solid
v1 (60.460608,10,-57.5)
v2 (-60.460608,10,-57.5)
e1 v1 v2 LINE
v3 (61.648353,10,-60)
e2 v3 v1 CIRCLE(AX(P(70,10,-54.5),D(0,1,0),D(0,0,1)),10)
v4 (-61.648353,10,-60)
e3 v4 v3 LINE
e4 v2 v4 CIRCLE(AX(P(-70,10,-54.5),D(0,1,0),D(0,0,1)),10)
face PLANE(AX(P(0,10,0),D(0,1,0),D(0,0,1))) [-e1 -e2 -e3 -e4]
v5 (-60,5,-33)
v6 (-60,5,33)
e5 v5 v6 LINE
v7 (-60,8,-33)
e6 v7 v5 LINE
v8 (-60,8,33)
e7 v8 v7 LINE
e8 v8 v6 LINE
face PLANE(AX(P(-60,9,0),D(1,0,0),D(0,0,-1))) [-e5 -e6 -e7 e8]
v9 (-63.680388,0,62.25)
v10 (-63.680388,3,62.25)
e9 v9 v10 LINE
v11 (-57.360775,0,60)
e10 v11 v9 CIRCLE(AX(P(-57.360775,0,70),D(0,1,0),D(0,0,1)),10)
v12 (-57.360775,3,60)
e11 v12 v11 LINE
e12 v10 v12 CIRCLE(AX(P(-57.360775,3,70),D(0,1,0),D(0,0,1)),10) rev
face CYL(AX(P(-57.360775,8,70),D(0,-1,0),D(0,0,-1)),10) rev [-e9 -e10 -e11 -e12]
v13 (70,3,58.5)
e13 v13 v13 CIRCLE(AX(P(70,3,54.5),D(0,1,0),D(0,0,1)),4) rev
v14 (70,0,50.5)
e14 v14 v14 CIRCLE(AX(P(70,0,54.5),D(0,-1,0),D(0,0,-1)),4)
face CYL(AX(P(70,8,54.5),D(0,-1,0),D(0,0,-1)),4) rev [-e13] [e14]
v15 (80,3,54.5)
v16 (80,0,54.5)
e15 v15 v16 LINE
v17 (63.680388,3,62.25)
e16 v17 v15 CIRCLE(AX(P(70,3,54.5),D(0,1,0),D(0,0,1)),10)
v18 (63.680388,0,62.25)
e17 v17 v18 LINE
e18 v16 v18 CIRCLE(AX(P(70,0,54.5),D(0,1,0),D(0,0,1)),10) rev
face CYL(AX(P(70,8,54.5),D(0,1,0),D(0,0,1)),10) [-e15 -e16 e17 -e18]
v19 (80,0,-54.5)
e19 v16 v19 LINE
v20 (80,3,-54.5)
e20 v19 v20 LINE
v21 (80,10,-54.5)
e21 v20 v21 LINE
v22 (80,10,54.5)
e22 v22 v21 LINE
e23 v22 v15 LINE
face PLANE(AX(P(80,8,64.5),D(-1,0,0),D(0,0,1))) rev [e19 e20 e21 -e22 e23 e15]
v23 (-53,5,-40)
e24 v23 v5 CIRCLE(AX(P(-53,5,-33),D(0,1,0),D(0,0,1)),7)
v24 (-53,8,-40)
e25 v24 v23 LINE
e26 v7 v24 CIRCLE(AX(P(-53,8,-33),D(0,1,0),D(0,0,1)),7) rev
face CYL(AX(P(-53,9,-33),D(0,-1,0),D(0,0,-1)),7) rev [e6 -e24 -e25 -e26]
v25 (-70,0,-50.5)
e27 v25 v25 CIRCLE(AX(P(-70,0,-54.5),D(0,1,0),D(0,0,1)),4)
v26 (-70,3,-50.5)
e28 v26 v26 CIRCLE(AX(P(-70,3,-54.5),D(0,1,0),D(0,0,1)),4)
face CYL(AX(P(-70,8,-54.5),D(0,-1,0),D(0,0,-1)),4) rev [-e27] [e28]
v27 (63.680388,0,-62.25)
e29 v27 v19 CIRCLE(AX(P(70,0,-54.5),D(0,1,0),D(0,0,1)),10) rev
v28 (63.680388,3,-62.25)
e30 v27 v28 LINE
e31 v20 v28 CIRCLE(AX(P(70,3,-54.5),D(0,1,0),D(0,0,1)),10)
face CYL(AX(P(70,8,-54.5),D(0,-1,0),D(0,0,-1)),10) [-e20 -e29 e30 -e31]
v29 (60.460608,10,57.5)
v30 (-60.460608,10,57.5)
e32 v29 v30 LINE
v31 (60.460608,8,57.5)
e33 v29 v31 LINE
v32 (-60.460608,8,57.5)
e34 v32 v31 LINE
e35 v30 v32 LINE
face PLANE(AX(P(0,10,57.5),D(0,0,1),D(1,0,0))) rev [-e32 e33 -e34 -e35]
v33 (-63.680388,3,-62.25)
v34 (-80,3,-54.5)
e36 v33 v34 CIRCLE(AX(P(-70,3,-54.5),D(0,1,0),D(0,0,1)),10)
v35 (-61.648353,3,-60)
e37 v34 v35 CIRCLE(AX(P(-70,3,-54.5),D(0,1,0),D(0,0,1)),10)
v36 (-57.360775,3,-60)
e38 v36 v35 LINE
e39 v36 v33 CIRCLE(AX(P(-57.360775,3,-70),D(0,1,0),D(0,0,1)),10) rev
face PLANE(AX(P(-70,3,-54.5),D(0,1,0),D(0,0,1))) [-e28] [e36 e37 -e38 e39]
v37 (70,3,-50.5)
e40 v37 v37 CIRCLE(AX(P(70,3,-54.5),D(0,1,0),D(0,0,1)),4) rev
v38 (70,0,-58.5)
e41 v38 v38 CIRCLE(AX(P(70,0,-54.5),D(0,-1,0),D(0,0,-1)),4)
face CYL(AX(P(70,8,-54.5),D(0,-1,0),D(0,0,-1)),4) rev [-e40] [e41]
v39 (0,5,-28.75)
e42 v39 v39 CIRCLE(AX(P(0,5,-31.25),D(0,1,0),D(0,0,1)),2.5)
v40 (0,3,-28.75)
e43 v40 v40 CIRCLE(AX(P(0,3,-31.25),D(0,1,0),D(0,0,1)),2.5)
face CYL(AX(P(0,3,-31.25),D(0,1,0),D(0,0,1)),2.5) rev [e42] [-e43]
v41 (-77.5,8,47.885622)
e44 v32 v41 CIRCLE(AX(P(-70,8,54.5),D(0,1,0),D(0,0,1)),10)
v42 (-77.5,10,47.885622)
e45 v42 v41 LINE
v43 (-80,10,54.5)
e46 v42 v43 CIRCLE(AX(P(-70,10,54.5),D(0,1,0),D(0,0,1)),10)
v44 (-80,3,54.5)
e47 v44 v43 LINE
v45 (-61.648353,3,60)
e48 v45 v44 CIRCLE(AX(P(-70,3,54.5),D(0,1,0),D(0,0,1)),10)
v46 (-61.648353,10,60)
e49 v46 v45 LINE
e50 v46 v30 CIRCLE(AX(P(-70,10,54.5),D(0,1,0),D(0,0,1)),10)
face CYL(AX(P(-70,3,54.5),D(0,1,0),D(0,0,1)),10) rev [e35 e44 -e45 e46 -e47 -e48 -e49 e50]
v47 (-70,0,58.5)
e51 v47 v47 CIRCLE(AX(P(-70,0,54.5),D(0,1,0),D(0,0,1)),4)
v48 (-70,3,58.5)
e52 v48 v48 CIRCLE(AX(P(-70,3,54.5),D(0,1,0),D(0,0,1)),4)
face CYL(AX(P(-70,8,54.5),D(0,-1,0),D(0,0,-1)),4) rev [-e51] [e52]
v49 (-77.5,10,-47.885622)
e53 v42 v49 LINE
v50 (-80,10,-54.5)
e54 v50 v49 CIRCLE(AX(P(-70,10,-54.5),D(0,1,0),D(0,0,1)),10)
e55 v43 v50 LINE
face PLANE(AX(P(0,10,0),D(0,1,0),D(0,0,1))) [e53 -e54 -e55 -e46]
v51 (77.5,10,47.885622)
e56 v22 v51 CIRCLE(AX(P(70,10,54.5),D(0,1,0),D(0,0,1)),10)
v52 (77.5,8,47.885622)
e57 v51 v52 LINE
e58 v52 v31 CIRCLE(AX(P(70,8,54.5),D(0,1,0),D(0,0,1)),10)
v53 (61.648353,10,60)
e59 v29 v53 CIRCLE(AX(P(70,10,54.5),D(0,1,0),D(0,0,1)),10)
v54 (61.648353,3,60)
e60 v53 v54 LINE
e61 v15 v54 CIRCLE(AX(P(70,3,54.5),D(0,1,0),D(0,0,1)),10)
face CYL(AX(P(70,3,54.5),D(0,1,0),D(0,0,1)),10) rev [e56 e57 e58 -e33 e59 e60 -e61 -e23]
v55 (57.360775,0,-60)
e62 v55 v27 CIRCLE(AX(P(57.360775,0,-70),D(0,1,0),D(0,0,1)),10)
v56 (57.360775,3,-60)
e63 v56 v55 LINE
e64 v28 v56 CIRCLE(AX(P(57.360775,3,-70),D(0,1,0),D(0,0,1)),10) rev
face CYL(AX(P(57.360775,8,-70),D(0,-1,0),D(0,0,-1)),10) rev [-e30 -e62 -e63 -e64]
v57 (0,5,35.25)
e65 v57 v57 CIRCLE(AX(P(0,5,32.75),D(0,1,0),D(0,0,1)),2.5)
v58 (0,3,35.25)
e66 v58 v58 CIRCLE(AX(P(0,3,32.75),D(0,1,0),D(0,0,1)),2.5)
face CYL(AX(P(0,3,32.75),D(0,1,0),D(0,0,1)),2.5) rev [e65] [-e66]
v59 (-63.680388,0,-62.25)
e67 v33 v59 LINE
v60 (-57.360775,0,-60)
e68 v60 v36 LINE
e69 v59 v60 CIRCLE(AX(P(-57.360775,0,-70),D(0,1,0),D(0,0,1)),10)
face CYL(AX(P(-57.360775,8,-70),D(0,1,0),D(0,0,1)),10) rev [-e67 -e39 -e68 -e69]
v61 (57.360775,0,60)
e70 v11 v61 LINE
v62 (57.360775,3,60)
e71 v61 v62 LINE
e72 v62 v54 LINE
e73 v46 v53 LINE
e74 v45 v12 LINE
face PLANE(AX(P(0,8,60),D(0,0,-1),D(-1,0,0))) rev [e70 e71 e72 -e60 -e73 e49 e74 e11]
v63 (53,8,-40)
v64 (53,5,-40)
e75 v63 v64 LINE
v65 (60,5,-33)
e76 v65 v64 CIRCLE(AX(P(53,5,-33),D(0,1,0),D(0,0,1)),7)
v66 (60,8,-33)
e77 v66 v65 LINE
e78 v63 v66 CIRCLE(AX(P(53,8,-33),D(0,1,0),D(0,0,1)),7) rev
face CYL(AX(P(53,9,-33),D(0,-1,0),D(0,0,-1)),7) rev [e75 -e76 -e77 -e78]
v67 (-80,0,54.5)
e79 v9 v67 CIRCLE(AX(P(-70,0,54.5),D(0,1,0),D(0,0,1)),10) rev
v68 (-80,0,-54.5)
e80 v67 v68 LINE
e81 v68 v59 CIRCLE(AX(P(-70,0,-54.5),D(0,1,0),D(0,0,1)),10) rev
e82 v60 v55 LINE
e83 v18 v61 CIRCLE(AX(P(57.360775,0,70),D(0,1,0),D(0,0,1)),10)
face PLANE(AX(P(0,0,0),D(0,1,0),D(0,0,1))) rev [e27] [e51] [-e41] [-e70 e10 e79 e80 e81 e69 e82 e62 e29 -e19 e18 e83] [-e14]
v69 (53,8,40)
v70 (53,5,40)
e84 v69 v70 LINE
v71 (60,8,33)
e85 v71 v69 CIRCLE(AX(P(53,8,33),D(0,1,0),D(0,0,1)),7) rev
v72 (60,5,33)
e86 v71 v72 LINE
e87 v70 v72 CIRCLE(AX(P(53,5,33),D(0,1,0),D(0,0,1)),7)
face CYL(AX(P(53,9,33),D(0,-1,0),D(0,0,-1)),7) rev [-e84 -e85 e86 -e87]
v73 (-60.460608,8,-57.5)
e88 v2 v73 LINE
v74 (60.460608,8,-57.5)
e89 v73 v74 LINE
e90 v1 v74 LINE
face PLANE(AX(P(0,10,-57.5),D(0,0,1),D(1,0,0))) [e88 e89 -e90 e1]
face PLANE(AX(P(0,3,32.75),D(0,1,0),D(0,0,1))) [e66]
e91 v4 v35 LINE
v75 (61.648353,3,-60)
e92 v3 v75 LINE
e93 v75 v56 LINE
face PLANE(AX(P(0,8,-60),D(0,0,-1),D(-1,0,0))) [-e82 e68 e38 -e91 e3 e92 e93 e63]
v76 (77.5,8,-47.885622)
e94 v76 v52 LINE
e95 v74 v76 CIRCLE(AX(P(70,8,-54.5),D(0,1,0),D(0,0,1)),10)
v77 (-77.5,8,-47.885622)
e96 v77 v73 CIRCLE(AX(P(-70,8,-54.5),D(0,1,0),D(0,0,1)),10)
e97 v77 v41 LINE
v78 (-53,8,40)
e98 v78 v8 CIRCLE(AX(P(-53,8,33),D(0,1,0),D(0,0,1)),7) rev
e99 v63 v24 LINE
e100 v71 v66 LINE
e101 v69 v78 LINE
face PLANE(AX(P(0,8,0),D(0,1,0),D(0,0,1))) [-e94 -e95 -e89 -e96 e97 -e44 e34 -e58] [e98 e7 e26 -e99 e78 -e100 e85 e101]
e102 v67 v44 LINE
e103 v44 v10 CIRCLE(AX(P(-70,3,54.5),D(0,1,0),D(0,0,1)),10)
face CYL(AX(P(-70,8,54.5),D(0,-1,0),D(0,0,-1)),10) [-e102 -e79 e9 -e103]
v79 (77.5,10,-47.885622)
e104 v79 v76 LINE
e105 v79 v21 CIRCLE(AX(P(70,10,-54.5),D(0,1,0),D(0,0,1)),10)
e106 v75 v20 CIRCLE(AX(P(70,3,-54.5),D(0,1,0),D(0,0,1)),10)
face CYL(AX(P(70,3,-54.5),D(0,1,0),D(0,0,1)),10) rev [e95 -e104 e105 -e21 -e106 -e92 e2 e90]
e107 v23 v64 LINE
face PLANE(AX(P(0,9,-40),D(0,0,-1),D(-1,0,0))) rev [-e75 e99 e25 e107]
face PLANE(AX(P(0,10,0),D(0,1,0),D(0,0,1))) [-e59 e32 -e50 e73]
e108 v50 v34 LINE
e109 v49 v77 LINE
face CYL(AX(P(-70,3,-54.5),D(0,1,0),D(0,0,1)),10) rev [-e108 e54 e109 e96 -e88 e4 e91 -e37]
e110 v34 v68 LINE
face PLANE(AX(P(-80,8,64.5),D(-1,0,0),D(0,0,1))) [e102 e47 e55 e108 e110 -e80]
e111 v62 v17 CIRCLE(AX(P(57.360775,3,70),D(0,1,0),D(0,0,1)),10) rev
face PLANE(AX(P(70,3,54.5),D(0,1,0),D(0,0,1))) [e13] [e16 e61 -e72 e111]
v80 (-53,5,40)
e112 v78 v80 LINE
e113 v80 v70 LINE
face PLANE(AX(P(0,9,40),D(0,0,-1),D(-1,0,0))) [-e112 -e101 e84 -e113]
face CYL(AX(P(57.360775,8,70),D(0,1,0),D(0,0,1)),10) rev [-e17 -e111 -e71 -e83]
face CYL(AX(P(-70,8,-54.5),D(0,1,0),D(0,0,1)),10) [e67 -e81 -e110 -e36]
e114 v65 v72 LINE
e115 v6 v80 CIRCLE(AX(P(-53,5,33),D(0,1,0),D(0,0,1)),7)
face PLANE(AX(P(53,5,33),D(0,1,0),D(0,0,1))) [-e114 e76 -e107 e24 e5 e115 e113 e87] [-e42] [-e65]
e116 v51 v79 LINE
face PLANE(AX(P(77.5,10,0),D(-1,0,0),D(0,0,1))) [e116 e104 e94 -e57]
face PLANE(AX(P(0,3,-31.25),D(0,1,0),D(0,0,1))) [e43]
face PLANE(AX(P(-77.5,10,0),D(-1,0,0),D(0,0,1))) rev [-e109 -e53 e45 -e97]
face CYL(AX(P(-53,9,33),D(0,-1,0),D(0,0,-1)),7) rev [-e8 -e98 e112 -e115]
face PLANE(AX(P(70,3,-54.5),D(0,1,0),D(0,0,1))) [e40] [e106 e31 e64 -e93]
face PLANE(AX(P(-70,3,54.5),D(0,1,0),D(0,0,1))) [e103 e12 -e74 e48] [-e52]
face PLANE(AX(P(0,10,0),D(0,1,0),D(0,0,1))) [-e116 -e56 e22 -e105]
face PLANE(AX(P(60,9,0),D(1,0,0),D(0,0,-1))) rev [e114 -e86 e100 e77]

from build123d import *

# Parameters (mm, degrees)
SKETCH1_W               = 160
SKETCH1_H               = 129
BOSS_EXTRUDE1_DEPTH     = 8
SKETCH1_3_R             = 4
CUT_EXTRUDE2_DEPTH      = 104.074002542
FILLET1_R               = 10
CUT_EXTRUDE4_DEPTH      = 1
CUT_EXTRUDE4_DEPTH_BACK = 3
CUT_EXTRUDE4_START      = 8
CUT_EXTRUDE9_DEPTH      = 104.074002542
CUT_EXTRUDE10_START     = 8
SKETCH1_17_R            = 2.5
SKETCH1_17_R_2          = 10
CUT_EXTRUDE10_DEPTH     = 5
BOSS_EXTRUDE4_START     = 10
BOSS_EXTRUDE4_DEPTH     = 10
FILLET2_R               = 10


with BuildPart() as part:
    # Sketch1 → Boss-Extrude1 (new body)
    with BuildSketch(Plane(origin=(0, 0, 0), x_dir=(1, 0, 0), z_dir=(0, 1, 0))):
        Rectangle(SKETCH1_W, SKETCH1_H)
    extrude(amount=BOSS_EXTRUDE1_DEPTH)

    # Sketch1<3> → Cut-Extrude2 (cut, through all)
    with BuildSketch(Plane(origin=(0, 0, 0), x_dir=(1, 0, 0), z_dir=(0, 1, 0))):
        with Locations(Location((-70, 54.5, 0), (0, 0, 270))):
            Circle(SKETCH1_3_R)
        with Locations(Location((-70, -54.5, 0), (0, 0, 270))):
            Circle(SKETCH1_3_R)
        with Locations(Location((70, -54.5, 0), (0, 0, 90))):
            Circle(SKETCH1_3_R)
        with Locations(Location((70, 54.5, 0), (0, 0, 90))):
            Circle(SKETCH1_3_R)
    extrude(amount=CUT_EXTRUDE2_DEPTH, mode=Mode.SUBTRACT)

    # Fillet1
    fillet1_edges = [part.edges().sort_by_distance(p)[0] for p in [
        (80, 4, 64.5),
        (-80, 4, 64.5),
        (-80, 4, -64.5),
        (80, 4, -64.5),
    ]]
    fillet(fillet1_edges, radius=FILLET1_R)

    # Sketch1<11> → Cut-Extrude4 (cut, two sides: drawn at the far end of the back side and taken through both)
    with BuildSketch(Plane(origin=(0, 0, 0), x_dir=(1, 0, 0), z_dir=(0, 1, 0)).offset(CUT_EXTRUDE4_START - CUT_EXTRUDE4_DEPTH_BACK)):
        with BuildLine():
            Line((53, -40), (-53, -40))
            ThreePointArc((-53, -40), (-57.949747468, -37.949747468), (-60, -33))
            Line((-60, -33), (-60, 33))
            ThreePointArc((-60, 33), (-57.949747468, 37.949747468), (-53, 40))
            Line((-53, 40), (53, 40))
            ThreePointArc((53, 40), (57.949747468, 37.949747468), (60, 33))
            Line((60, 33), (60, -33))
            ThreePointArc((60, -33), (57.949747468, -37.949747468), (53, -40))
        make_face()
    extrude(amount=CUT_EXTRUDE4_DEPTH + CUT_EXTRUDE4_DEPTH_BACK, mode=Mode.SUBTRACT)

    # Sketch1<13> → Cut-Extrude9 (cut, through all)
    with BuildSketch(Plane(origin=(0, 0, 0), x_dir=(1, 0, 0), z_dir=(0, 1, 0))):
        with BuildLine():
            Line((-70, -64.5), (70, -64.5))
            ThreePointArc((70, -64.5), (65.25658351, -63.303408431), (61.648353456, -60))
            Line((61.648353456, -60), (-61.648353456, -60))
            ThreePointArc((-61.648353456, -60), (-65.25658351, -63.303408431), (-70, -64.5))
        make_face()
        with BuildLine():
            ThreePointArc((61.648353456, 60), (65.25658351, 63.303408431), (70, 64.5))
            Line((70, 64.5), (-69.999999984, 64.5))
            ThreePointArc((-69.999999984, 64.5), (-65.256583502, 63.303408427), (-61.648353456, 60))
            Line((-61.648353456, 60), (61.648353456, 60))
        make_face()
    extrude(amount=CUT_EXTRUDE9_DEPTH, mode=Mode.SUBTRACT)

    # Sketch1<17> → Cut-Extrude10 (cut)
    with BuildSketch(Plane(origin=(0, 0, 0), x_dir=(1, 0, 0), z_dir=(0, 1, 0)).offset(CUT_EXTRUDE10_START)):
        with Locations(Location((0, 31.25, 0), (0, 0, 270))):
            Circle(SKETCH1_17_R)
        with Locations((-70, 54.5)):
            Circle(SKETCH1_17_R_2)
        with Locations((70, 54.5)):
            Circle(SKETCH1_17_R_2)
        with Locations((-70, -54.5)):
            Circle(SKETCH1_17_R_2)
        with Locations((70, -54.5)):
            Circle(SKETCH1_17_R_2)
        with Locations(Location((0, -32.75, 0), (0, 0, 270))):
            Circle(SKETCH1_17_R)
    extrude(amount=-CUT_EXTRUDE10_DEPTH, mode=Mode.SUBTRACT)

    # Sketch1<18> → Boss-Extrude4 (add)
    with BuildSketch(Plane(origin=(0, 0, 0), x_dir=(1, 0, 0), z_dir=(0, 1, 0)).offset(BOSS_EXTRUDE4_START)):
        with BuildLine():
            ThreePointArc((60.460607986, 57.5), (60.967568701, 58.791291743), (61.648353456, 60))
            Line((61.648353456, 60), (-61.648353456, 60))
            ThreePointArc((-61.648353456, 60), (-60.967568701, 58.791291743), (-60.460607986, 57.5))
            Line((-60.460607986, 57.5), (60.460607986, 57.5))
        make_face()
        with BuildLine():
            Line((-80, 54.500000177), (-80, -54.5))
            ThreePointArc((-80, -54.5), (-79.354143467, -50.964466094), (-77.5, -47.885621722))
            Line((-77.5, -47.885621722), (-77.5, 47.885621722))
            ThreePointArc((-77.5, 47.885621722), (-79.354143498, 50.964466177), (-80, 54.500000177))
        make_face()
        with BuildLine():
            ThreePointArc((77.5, -47.885621722), (79.354143467, -50.964466094), (80, -54.5))
            Line((80, -54.5), (80, 54.5))
            ThreePointArc((80, 54.5), (79.354143467, 50.964466094), (77.5, 47.885621722))
            Line((77.5, 47.885621722), (77.5, -47.885621722))
        make_face()
        with BuildLine():
            Line((-61.648353456, -60), (61.648353456, -60))
            ThreePointArc((61.648353456, -60), (60.967568701, -58.791291743), (60.460607986, -57.5))
            Line((60.460607986, -57.5), (-60.460607986, -57.5))
            ThreePointArc((-60.460607986, -57.5), (-60.967568701, -58.791291743), (-61.648353456, -60))
        make_face()
    extrude(amount=-BOSS_EXTRUDE4_DEPTH)

    # Fillet2
    # the kernel refuses this fillet: 10 mm, written as the material it adds along each edge
    with BuildSketch(Plane(origin=(61.648353456, 0, 60), x_dir=(0.6702455950029323, 0, 0.7421393685684416), z_dir=(0, 1, 0)), Plane(origin=(-61.648353456, 0, -60), x_dir=(-0.6702455950029282, 0, -0.7421393685684453), z_dir=(0, 1, 0))) as fillet2_piece_1:
        with BuildLine():
            CenterArc((4.547663341, -9.884436465), FILLET2_R, 98.719009802, 39.194967426)
            Line((-2.873730345, -3.181980515), (0, 0))
            ThreePointArc((0, 0), (1.51588778, -0.115563535), (3.03177556, 0))
        make_face()
    extrude(amount=3)
    with BuildSketch(Plane(origin=(-61.648353456, 0, 60), x_dir=(1, 0, 0), z_dir=(0, 1, 0))) as fillet2_piece_2:
        with BuildLine():
            CenterArc((4.287578116, -10), FILLET2_R, 90, 39.194967426)
            ThreePointArc((-2.032034214, -2.25), (-0.930252859, -1.20245595), (0, 0))
            Line((0, 0), (4.287578116, 0))
        make_face()
    extrude(amount=3)
    with BuildSketch(Plane(origin=(61.648353456, 0, -60), x_dir=(0.6702455950029361, 0, -0.7421393685684381), z_dir=(0, 1, 0))) as fillet2_piece_3:
        with BuildLine():
            CenterArc((4.547663341, 9.884436465), FILLET2_R, 222.086022772, 39.194967426)
            Line((-2.873730345, 3.181980515), (0, 0))
            ThreePointArc((0, 0), (1.51588778, 0.115563535), (3.03177556, 0))
        make_face()
    extrude(amount=3)


solid = part.part
